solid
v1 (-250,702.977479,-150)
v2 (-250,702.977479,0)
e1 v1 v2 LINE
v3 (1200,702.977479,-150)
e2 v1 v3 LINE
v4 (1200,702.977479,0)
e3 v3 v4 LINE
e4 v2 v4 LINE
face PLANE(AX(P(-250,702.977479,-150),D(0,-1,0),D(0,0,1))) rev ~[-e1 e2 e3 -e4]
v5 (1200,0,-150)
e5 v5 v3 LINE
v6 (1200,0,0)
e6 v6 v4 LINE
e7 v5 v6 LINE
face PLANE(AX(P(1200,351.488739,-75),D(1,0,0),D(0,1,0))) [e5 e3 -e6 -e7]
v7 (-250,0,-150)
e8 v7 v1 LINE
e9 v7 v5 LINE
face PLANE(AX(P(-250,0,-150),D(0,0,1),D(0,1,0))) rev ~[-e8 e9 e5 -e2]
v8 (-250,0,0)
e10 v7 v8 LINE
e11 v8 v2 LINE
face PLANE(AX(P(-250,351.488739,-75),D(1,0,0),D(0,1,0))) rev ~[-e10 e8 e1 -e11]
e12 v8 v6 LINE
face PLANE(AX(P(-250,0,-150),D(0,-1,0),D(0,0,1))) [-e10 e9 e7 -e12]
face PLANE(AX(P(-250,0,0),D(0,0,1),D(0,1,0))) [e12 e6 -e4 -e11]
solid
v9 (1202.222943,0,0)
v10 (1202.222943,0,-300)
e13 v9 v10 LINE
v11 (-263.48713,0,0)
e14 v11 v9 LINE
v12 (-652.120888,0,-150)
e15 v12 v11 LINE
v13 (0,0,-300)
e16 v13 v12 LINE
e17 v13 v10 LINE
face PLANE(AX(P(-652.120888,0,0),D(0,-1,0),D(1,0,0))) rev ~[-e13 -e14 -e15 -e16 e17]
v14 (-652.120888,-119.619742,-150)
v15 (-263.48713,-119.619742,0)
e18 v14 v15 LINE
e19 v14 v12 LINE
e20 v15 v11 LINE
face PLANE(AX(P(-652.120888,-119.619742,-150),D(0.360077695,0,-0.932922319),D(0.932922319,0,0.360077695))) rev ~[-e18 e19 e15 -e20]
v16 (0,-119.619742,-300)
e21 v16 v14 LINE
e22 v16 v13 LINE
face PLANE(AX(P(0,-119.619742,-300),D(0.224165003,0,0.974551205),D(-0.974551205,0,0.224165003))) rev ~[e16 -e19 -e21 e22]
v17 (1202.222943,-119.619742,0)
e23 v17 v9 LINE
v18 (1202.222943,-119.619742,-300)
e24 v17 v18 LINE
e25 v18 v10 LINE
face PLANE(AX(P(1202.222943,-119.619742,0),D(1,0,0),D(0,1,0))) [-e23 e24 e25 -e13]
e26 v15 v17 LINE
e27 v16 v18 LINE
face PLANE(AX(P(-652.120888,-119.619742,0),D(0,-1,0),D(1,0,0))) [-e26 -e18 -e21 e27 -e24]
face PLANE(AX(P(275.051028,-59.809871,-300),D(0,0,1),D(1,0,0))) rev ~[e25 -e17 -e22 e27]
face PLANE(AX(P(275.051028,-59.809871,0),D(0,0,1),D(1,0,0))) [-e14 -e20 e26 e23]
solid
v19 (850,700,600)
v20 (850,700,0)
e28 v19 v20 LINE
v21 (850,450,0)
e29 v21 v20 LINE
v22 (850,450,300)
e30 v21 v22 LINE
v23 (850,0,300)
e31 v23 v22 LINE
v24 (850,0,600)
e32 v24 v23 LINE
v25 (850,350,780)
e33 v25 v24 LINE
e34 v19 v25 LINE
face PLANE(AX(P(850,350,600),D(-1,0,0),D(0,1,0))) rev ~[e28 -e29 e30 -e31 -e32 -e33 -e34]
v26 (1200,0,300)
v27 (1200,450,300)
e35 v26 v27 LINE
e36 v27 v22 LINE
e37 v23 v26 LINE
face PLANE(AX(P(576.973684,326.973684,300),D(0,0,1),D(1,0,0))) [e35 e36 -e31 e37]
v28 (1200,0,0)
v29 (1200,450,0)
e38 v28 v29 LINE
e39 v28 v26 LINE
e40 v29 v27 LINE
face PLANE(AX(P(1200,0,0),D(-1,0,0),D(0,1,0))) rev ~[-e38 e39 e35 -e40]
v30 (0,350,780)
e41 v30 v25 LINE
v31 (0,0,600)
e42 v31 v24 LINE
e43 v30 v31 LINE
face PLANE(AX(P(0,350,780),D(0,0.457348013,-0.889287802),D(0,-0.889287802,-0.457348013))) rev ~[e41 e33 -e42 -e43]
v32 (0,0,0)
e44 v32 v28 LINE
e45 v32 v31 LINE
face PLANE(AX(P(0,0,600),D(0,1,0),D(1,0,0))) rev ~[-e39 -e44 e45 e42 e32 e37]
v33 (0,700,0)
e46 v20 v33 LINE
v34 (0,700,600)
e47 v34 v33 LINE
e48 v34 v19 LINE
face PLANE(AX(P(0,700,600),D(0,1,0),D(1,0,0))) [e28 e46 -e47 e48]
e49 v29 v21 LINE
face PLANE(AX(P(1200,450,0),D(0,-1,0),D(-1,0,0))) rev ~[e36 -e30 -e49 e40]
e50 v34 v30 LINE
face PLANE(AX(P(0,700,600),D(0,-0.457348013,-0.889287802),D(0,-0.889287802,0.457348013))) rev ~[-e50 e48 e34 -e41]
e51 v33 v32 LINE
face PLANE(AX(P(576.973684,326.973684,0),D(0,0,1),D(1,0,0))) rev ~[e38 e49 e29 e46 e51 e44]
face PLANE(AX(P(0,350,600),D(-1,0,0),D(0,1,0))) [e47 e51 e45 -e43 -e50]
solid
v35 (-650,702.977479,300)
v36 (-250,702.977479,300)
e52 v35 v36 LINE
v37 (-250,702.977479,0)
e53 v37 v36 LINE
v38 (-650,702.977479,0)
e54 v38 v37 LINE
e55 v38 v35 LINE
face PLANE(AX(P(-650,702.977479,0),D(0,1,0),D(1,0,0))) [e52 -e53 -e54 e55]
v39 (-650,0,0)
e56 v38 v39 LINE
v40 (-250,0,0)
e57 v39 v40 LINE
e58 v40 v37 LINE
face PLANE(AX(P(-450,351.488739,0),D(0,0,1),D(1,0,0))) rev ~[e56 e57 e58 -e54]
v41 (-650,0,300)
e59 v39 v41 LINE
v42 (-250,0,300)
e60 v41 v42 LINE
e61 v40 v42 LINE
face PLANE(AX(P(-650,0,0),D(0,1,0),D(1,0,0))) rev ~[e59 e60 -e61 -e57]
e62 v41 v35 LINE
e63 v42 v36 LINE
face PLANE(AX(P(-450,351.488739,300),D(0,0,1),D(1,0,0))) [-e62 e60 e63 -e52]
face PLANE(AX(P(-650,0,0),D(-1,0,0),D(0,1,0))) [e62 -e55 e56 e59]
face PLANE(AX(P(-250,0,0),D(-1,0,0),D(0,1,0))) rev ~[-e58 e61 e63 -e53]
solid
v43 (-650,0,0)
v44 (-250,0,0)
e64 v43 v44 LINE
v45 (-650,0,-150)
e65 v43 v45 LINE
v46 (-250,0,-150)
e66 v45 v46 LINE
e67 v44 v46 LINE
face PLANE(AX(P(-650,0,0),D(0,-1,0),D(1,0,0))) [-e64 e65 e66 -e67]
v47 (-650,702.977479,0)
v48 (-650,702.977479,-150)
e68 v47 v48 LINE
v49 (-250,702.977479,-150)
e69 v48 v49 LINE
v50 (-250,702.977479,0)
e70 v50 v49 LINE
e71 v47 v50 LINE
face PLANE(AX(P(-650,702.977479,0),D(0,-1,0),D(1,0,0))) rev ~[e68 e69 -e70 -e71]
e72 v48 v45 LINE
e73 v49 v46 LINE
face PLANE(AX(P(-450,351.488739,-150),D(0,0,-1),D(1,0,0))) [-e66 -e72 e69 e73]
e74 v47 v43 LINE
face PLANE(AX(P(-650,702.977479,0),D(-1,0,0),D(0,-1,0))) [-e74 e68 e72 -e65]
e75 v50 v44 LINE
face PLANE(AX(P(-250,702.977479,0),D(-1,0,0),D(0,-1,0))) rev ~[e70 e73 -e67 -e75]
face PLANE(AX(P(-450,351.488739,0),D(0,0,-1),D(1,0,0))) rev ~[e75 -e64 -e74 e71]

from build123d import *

# Parameters (mm, degrees)
F0_W      = 400
F0_H      = 702.9774785042
F1_DEPTH  = 300
F2_DEPTH  = 300
F4_DEPTH  = 300
F5_W      = 850
F5_H      = 350
F6_DEPTH  = 180
F8_DEPTH  = 1000
F9_DEPTH  = 180
F10_DEPTH = 180
F11_DEPTH = 1000
F13_DEPTH = 10000
F14_W     = 1854.3438315392
F14_H     = 119.6197420359
F15_DEPTH = 300
F17_DEPTH = 200
F18_DEPTH = 200
F19_W     = 400
F19_H     = 702.9774785042
F20_DEPTH = 150
F21_W     = 702.9774785042
F21_H     = 150
F22_DEPTH = 1450


# Not quite as in the source:
# - a feature of the source that left no trace in its solid (it failed there, or was rolled back) is left out
# - a feature names something its author has since deleted; it is built from what else it names


with BuildPart() as f1:
    # F0 (on Top) → F1 (new body)
    with BuildSketch(Plane.XY):
        with Locations((-450, 351.4887392521)):
            Rectangle(F0_W, F0_H)
    extrude(amount=F1_DEPTH)

    # F16 (on face) → F18 (cut)
    with BuildSketch(Plane.XZ.offset(119.6197420359)):
        Polygon((0, -300), (-652.1208882332, -150), (-652.1208882332, -300), align=None)
        Polygon((-652.1208882332, 0), (-652.1208882332, -150), (-263.4871304035, 0), align=None)
    extrude(amount=-F18_DEPTH, mode=Mode.SUBTRACT)


with BuildPart() as f2:
    # F0 (on Top) → F2 (new body)
    with BuildSketch(Plane.XY):
        Polygon((0, 700), (0, 0), (1200, 0), (1200, 150.83758533), (1200, 450), (850, 450), (850, 700), align=None)
    extrude(amount=F2_DEPTH)

    # F3 (on face) → F4 (join)
    with BuildSketch(Plane.XY.offset(300)):
        Polygon((0, 700), (0, 0), (850, 0), (850, 450), (850, 700), align=None)
    extrude(amount=F4_DEPTH)

    # F5 (on face) → F6 (join)
    with BuildSketch(Plane.XY.offset(600)):
        with Locations((425, 175)):
            Rectangle(F5_W, F5_H)
    extrude(amount=F6_DEPTH)

    # F7 (on face) → F8 (cut)
    with BuildSketch(Plane(origin=(0, 0, 0), x_dir=(0, -1, 0), z_dir=(-1, 0, 0))):
        Polygon((0, 780), (-350, 780), (0, 600), align=None)
    extrude(amount=-F8_DEPTH, mode=Mode.SUBTRACT)

    # F5 (on face) → F9 (join)
    with BuildSketch(Plane.XY.offset(600)):
        with Locations((425, 525)):
            Rectangle(F5_W, F5_H)
    extrude(amount=F9_DEPTH)

    # F5 (on face) → F10 (join)
    with BuildSketch(Plane.XY.offset(600)):
        with Locations((425, 525)):
            Rectangle(F5_W, F5_H)
        with Locations((425, 175)):
            Rectangle(F5_W, F5_H)
    extrude(amount=F10_DEPTH)

    # F7 (on face) → F11 (cut)
    with BuildSketch(Plane(origin=(0, 0, 0), x_dir=(0, -1, 0), z_dir=(-1, 0, 0))):
        Polygon((0, 780), (-350, 780), (0, 600), align=None)
    extrude(amount=-F11_DEPTH, mode=Mode.SUBTRACT)

    # F12 (on face) → F13 (cut)
    with BuildSketch(Plane(origin=(0, 0, 0), x_dir=(0, -1, 0), z_dir=(-1, 0, 0))):
        Polygon((-700, 600), (-350, 780), (-700, 780), align=None)
    extrude(amount=-F13_DEPTH, mode=Mode.SUBTRACT)


with BuildPart() as f15:
    # F14 (on Top) → F15 (new body)
    with BuildSketch(Plane.XY):
        with Locations((275.0510275364, -59.8098710179)):
            Rectangle(F14_W, F14_H)
    extrude(amount=-F15_DEPTH)

    # F16 (on face) → F17 (cut)
    with BuildSketch(Plane.XZ.offset(119.6197420359)):
        Polygon((0, -300), (-652.1208882332, -150), (-652.1208882332, -300), align=None)
        Polygon((-652.1208882332, 0), (-652.1208882332, -150), (-263.4871304035, 0), align=None)
    extrude(amount=-F17_DEPTH, mode=Mode.SUBTRACT)


with BuildPart() as f20:
    # F19 (on face) → F20 (new body)
    with BuildSketch(Plane(origin=(0, 0, 0), x_dir=(1, 0, 0), z_dir=(0, 0, -1))):
        with Locations((-450, -351.4887392521)):
            Rectangle(F19_W, F19_H)
    extrude(amount=F20_DEPTH)


with BuildPart() as f22:
    # F21 (on face) → F22 (new body)
    with BuildSketch(Plane.YZ.offset(-250)):
        with Locations((351.4887392521, -75)):
            Rectangle(F21_W, F21_H)
    extrude(amount=F22_DEPTH)


solid = Compound([f1.part, f2.part, f15.part, f20.part, f22.part])
